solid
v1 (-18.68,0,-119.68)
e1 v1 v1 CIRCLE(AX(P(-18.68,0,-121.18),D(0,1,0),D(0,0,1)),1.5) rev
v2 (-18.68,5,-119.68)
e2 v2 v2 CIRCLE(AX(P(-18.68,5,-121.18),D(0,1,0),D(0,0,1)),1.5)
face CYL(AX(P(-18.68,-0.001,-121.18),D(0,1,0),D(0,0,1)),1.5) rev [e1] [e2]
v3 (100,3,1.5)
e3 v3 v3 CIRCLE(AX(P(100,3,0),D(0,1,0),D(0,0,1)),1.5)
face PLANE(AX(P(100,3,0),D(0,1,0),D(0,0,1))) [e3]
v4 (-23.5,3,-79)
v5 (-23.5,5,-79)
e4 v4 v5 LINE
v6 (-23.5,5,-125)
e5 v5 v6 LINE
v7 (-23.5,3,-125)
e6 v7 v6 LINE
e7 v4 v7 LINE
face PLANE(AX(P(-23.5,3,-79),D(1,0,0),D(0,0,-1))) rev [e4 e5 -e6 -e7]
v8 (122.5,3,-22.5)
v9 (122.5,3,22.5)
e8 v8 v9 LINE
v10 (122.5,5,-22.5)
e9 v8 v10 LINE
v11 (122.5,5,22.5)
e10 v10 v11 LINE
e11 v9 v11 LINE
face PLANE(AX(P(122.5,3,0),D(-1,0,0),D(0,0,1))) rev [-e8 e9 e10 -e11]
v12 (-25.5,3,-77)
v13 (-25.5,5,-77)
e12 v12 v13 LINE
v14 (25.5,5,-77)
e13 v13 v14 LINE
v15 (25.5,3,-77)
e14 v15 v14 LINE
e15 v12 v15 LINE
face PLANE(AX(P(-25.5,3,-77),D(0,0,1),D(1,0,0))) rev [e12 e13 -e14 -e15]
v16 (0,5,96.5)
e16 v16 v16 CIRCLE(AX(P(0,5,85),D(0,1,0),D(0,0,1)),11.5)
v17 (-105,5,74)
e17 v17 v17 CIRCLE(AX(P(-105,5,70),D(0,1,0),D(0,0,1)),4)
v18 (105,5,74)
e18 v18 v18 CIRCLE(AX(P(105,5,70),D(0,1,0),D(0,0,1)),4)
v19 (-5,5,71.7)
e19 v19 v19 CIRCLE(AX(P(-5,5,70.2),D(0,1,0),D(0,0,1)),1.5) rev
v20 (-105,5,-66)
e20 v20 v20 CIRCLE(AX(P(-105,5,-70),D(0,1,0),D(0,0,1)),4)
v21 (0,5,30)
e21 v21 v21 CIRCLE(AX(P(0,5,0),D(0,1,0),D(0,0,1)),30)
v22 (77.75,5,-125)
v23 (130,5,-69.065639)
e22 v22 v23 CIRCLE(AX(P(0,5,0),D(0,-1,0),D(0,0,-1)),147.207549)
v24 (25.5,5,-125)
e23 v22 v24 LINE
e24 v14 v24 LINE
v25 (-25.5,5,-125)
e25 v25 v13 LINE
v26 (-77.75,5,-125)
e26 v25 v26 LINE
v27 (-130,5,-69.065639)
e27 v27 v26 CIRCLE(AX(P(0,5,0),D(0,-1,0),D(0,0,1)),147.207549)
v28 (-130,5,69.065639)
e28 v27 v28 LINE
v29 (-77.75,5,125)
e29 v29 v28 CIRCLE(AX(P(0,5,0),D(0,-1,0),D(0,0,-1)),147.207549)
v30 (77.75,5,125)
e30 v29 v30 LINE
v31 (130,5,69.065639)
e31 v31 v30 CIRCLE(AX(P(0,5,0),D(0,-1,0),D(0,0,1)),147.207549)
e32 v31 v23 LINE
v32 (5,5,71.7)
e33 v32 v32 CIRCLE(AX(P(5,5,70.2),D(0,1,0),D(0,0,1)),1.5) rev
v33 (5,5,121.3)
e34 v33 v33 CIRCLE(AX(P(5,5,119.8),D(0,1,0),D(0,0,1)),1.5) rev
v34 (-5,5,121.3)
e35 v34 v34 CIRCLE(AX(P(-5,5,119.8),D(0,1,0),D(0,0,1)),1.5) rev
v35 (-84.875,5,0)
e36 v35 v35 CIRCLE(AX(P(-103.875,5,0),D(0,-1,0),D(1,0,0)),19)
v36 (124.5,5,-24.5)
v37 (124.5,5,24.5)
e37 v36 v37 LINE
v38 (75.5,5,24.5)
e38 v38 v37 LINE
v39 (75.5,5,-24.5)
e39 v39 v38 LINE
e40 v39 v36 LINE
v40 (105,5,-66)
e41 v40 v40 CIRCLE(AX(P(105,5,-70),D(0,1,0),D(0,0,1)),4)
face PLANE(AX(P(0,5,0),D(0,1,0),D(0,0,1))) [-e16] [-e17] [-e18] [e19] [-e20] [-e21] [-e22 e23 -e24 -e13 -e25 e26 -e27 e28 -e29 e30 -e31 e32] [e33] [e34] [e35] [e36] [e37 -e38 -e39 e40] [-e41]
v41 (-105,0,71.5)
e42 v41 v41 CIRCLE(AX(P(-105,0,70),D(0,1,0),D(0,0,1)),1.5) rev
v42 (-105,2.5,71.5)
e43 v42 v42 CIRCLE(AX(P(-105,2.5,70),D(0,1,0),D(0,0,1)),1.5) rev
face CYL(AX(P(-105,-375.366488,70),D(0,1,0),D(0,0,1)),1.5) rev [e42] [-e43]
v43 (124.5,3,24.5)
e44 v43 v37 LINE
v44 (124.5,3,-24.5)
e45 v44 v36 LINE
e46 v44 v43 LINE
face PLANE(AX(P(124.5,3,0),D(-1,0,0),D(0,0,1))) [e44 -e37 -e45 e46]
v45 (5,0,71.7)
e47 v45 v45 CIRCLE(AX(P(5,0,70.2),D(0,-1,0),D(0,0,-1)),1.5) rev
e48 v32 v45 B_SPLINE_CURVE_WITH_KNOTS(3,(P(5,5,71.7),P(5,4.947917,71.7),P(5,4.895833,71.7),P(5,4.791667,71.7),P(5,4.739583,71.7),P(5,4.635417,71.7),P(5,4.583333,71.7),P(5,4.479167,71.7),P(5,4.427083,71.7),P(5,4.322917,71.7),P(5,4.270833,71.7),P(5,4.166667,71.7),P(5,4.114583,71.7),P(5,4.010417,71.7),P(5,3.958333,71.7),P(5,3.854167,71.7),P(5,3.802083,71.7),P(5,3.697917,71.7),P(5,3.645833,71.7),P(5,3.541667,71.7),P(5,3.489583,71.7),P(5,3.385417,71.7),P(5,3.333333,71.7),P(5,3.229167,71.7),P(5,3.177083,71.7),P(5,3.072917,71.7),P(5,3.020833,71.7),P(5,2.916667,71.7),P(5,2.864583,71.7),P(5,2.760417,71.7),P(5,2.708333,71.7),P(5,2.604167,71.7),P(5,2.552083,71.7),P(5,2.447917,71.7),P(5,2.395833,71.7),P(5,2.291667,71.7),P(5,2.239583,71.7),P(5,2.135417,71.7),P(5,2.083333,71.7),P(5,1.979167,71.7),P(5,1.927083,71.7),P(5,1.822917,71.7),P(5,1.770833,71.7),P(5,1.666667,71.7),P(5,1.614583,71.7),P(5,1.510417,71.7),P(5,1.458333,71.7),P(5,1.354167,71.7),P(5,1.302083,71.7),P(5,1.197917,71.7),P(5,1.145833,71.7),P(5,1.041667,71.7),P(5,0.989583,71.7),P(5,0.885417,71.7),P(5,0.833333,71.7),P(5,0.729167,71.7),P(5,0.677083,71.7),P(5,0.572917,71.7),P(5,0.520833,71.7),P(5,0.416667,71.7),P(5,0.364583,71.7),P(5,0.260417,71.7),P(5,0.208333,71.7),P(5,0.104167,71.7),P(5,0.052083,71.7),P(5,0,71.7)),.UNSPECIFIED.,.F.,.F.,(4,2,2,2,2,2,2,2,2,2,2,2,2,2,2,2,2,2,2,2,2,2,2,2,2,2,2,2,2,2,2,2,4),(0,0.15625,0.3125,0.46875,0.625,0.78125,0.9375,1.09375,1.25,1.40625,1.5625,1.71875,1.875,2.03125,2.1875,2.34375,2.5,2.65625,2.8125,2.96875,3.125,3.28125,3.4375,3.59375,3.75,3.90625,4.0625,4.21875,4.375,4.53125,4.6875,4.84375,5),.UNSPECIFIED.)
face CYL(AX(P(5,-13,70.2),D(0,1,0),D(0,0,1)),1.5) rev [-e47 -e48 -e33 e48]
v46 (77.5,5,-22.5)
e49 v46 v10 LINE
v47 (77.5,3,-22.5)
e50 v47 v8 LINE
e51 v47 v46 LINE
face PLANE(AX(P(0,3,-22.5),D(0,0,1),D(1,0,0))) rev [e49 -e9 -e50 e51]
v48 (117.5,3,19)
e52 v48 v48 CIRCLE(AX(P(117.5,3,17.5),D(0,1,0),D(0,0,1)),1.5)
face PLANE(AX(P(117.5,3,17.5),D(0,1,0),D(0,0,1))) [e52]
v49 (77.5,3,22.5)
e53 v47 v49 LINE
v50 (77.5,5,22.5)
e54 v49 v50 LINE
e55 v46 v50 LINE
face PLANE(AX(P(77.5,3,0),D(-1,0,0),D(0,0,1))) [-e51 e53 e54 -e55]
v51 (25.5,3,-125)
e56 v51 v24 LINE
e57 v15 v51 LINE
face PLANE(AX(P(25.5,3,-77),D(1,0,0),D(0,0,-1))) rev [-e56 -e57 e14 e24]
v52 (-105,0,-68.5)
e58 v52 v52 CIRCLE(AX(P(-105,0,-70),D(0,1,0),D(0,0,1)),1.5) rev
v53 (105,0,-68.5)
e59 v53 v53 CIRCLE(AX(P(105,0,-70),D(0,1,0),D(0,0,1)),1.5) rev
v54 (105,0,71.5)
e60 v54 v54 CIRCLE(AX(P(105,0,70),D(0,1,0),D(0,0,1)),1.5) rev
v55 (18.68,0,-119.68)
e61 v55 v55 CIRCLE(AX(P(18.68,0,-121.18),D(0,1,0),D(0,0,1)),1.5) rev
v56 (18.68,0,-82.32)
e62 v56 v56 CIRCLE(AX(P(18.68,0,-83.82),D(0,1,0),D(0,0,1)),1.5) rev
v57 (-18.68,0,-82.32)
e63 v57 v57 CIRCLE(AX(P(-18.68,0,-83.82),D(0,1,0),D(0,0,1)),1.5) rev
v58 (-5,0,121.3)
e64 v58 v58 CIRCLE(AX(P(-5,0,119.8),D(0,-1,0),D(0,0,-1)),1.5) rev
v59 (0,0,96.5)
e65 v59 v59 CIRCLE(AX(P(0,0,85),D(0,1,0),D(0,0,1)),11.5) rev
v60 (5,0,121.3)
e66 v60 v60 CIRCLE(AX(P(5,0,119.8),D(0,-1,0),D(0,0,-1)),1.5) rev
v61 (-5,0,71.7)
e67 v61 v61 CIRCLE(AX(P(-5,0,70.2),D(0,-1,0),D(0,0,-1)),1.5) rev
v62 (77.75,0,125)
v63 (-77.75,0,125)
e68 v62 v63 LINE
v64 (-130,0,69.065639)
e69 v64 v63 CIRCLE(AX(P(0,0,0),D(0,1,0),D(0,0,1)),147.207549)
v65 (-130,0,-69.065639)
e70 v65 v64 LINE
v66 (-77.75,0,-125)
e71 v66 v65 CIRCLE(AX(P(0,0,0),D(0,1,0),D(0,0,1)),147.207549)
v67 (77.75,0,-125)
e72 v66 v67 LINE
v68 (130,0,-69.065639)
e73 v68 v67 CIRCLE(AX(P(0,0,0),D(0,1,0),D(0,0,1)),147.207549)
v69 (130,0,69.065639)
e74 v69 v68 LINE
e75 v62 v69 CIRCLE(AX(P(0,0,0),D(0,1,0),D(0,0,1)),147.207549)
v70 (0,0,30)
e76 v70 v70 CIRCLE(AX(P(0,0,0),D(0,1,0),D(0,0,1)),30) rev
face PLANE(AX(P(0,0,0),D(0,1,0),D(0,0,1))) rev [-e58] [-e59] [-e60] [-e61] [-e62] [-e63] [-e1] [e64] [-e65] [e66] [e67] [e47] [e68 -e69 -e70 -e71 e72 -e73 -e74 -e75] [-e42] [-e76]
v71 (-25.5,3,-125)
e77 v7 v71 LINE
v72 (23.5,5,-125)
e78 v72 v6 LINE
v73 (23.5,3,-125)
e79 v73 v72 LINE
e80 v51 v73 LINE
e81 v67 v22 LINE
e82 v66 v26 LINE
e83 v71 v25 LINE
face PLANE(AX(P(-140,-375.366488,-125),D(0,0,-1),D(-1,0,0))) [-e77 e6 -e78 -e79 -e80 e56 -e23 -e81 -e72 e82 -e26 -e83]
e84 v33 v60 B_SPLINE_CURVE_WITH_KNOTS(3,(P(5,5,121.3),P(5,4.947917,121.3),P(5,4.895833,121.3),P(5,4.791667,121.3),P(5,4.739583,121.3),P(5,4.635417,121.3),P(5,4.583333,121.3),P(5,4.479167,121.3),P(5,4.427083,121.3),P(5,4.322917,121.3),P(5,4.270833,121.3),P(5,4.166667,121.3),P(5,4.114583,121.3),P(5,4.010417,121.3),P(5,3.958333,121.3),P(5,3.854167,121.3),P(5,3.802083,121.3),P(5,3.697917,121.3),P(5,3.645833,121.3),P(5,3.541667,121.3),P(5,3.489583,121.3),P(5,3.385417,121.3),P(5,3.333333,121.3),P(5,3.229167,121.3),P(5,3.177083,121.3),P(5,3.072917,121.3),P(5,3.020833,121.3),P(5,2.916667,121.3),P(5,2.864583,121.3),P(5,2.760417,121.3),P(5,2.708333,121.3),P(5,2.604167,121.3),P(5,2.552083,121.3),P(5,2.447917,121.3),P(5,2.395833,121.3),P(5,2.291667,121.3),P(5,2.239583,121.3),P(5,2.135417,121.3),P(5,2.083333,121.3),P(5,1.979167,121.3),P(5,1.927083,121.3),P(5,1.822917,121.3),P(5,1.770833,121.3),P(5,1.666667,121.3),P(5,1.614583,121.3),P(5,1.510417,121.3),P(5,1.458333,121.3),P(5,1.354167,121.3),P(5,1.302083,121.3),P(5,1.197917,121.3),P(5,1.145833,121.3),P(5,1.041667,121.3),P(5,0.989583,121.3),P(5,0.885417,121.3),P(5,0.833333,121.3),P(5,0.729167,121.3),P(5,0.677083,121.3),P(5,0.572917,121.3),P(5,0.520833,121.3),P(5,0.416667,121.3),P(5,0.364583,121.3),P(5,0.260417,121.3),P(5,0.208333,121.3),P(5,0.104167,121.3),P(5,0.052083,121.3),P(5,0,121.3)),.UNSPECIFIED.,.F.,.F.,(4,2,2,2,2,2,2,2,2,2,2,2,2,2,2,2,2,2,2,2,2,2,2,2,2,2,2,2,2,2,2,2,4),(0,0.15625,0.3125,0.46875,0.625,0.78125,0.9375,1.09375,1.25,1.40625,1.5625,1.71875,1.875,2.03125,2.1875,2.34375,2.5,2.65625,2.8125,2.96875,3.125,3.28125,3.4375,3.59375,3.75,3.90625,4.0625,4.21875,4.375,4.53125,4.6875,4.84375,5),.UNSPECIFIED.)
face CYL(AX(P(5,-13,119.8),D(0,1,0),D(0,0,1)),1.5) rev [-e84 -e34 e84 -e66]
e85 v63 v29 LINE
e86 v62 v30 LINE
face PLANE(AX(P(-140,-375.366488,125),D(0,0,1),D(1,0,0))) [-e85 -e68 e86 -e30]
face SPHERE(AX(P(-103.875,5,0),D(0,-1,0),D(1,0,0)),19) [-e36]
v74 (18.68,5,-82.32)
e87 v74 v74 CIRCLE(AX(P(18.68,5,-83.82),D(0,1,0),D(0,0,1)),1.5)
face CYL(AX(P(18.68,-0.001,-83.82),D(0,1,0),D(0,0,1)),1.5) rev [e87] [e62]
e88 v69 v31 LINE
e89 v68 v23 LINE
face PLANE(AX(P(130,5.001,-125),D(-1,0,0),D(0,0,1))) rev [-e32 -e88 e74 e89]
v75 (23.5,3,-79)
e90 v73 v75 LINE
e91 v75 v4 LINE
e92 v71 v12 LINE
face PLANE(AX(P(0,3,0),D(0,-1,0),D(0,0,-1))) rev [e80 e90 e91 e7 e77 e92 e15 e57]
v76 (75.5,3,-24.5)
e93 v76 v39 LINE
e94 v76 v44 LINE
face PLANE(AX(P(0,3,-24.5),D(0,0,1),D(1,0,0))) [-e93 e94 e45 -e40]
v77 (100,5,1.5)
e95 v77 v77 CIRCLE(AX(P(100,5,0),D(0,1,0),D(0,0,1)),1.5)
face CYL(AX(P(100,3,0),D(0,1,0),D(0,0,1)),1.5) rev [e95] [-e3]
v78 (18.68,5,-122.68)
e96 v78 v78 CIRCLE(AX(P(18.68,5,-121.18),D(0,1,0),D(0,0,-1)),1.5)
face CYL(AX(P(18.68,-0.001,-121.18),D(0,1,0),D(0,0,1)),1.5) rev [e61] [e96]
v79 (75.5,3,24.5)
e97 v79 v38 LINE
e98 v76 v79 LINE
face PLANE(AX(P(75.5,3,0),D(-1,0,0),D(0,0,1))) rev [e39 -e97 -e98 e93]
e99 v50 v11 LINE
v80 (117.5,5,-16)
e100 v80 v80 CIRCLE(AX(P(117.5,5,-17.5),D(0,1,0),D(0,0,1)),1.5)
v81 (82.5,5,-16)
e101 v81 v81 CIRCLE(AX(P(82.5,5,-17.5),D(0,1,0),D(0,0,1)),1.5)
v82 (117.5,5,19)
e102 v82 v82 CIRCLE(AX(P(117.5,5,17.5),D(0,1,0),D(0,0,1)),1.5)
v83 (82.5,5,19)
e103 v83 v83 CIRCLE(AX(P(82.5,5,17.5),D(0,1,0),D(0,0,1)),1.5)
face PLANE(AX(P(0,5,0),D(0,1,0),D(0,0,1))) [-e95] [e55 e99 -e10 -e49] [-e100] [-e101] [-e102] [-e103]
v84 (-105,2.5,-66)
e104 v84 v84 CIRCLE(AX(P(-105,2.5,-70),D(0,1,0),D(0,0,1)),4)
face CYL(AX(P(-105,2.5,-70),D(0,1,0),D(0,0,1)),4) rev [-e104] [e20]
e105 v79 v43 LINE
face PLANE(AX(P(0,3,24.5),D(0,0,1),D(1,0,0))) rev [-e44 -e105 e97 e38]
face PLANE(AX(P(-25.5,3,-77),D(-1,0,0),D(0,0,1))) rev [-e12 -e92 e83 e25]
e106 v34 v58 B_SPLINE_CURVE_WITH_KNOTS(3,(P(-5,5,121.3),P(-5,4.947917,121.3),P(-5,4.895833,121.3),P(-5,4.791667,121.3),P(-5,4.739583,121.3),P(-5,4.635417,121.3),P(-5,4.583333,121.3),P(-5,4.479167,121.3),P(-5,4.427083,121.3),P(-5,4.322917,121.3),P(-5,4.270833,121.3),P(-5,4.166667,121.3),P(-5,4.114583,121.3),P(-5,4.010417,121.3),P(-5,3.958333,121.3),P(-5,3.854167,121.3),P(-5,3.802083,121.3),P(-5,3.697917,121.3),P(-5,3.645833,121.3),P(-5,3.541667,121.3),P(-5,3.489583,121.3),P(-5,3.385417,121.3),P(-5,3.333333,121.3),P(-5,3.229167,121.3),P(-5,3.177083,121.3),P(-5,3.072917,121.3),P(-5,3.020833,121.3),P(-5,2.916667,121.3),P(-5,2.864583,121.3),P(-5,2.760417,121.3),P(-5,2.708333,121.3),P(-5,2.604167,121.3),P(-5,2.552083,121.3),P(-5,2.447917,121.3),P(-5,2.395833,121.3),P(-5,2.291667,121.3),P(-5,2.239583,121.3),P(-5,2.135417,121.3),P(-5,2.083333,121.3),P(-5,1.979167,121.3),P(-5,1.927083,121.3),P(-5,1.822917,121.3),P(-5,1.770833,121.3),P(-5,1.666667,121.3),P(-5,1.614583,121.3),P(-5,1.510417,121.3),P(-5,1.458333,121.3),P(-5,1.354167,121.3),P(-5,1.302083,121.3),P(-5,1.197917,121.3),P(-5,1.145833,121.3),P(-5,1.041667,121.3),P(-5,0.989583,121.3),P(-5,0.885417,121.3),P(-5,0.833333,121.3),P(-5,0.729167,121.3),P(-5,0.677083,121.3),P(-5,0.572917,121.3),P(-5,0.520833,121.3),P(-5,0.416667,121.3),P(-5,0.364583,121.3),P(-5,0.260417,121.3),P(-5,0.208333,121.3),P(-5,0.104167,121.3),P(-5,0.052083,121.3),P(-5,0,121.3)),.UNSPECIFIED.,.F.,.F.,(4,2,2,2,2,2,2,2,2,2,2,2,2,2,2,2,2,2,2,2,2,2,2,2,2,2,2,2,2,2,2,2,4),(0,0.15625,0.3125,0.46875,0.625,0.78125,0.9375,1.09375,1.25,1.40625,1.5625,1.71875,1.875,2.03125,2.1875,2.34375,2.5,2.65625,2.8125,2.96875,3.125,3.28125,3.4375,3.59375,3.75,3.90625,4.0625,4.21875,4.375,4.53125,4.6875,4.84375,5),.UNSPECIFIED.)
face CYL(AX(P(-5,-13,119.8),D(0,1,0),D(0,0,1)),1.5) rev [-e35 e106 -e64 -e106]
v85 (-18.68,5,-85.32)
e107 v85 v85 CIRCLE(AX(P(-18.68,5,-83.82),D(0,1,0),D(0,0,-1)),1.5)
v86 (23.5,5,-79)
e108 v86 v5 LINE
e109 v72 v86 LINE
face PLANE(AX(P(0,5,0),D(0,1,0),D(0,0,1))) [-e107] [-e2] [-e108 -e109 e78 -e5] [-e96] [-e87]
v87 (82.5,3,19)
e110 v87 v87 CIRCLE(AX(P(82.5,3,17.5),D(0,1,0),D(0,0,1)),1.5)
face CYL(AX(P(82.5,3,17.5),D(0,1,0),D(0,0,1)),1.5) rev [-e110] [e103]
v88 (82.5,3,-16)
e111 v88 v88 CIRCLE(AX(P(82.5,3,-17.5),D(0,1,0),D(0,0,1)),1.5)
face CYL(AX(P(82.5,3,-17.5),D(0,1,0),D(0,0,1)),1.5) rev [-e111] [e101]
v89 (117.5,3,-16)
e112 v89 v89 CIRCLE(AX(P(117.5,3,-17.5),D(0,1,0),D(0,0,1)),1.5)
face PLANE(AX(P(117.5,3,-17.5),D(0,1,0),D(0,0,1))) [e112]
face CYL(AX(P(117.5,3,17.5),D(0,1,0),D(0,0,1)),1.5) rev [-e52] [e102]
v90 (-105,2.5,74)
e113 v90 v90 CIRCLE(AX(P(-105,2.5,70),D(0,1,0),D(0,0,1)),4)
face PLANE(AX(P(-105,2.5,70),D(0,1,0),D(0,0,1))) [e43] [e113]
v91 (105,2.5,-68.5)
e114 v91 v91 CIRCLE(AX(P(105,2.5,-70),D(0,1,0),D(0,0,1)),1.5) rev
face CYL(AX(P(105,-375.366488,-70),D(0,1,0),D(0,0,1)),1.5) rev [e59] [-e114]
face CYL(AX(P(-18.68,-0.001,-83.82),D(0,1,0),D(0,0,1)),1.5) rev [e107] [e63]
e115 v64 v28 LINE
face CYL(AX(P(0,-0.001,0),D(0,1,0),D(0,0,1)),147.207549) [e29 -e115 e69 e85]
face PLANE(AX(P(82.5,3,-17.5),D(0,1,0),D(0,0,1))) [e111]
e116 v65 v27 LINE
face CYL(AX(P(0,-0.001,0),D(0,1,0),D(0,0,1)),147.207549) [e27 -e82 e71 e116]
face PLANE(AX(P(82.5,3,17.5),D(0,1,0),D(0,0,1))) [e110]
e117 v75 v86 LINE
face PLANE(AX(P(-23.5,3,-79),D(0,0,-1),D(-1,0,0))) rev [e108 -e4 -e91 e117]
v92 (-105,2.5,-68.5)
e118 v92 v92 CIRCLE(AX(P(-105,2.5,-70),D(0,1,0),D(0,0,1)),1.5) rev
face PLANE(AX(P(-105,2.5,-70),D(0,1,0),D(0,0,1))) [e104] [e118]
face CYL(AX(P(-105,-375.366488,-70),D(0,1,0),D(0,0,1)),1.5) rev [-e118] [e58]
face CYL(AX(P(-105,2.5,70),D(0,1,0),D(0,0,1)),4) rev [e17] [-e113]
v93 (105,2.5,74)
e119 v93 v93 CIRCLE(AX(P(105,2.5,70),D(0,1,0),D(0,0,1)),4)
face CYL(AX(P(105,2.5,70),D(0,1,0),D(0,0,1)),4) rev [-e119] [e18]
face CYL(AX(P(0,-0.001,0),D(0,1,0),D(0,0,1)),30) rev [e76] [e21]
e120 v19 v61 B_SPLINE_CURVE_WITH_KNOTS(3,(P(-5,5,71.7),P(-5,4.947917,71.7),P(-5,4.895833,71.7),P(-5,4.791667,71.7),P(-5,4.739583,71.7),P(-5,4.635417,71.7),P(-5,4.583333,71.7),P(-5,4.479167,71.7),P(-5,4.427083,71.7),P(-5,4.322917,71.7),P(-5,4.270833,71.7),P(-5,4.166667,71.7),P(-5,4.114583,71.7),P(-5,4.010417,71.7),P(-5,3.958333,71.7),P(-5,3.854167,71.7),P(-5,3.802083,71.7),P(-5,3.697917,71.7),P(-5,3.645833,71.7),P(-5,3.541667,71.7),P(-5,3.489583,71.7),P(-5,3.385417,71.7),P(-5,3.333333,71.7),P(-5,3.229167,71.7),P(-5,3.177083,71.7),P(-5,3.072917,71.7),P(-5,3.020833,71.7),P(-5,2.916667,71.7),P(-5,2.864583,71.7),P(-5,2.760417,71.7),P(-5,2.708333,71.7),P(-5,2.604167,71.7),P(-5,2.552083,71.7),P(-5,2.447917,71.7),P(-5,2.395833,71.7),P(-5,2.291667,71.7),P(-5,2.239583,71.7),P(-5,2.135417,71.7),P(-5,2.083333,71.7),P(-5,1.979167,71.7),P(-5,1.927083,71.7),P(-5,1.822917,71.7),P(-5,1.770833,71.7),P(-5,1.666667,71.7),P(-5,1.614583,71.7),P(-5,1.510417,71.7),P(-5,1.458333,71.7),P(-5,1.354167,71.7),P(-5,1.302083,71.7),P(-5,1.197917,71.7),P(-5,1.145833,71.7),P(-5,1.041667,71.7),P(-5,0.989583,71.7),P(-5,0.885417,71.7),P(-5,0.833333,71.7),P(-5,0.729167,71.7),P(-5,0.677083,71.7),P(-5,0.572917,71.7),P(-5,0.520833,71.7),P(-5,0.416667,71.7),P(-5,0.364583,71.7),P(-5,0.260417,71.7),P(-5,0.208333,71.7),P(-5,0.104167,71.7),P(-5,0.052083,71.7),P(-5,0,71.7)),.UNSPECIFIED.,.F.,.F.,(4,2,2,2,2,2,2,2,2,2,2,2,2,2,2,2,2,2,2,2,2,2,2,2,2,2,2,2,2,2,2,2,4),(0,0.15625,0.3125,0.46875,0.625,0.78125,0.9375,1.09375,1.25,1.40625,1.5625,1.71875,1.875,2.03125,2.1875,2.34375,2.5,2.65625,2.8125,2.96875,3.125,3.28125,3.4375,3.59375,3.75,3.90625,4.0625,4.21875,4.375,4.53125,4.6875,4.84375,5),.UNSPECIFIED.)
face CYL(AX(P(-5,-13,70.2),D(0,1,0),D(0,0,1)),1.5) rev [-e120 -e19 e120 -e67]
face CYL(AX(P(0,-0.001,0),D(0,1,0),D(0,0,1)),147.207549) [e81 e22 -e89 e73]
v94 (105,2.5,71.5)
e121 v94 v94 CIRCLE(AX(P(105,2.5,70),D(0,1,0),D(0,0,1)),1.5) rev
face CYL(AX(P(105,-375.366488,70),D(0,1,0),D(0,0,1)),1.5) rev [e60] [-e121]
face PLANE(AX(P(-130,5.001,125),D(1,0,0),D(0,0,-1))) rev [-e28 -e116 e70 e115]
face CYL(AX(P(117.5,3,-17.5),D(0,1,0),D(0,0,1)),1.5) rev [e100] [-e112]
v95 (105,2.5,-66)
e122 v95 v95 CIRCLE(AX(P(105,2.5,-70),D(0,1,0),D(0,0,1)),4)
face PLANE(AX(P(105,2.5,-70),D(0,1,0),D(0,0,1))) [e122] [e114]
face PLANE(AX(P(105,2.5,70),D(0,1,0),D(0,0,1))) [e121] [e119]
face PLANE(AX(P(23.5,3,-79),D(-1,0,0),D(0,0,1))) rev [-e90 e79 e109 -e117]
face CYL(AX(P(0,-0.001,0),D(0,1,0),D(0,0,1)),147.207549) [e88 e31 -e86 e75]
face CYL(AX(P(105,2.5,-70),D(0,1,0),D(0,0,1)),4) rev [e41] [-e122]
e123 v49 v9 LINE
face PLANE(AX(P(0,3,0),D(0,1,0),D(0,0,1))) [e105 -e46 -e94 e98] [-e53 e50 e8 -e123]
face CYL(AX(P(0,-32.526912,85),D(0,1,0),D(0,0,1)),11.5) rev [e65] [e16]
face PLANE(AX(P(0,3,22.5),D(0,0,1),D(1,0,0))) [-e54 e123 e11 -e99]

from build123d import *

# Parameters (mm, degrees)
SKETCH_1_W           = 200
SKETCH_1_H           = 150
EXTRUDE_1_DEPTH      = 5
SKETCH_2_W           = 280
SKETCH_2_H           = 250
SKETCH_2_R           = 1.5
EXTRUDE_2_DEPTH      = 5
SKETCH_3_R           = 11.5
CUT_EXTRUDE_1_DEPTH  = 5
SKETCH_4_R           = 3
SKETCH_4_R_2         = 1.5
EXTRUDE_3_DEPTH      = 13
CUT_EXTRUDE_4_REACH  = 190.133
SKETCH_8_R           = 1.5
CUT_EXTRUDE_5_REACH  = 190.133
SKETCH_9_W           = 10
SKETCH_9_H           = 250
SKETCH_10_W          = 41.454704644
SKETCH_10_H          = 62.998147515
CUT_EXTRUDE_6_DEPTH  = 13
CUT_EXTRUDE_7_REACH  = 182.416
SKETCH_11_R          = 1.5
CUT_EXTRUDE_8_DEPTH  = 2
CUT_EXTRUDE_9_REACH  = 182.416
SKETCH_13_R          = 30
CUT_EXTRUDE_10_REACH = 182.416
SKETCH_17_R          = 4
CUT_EXTRUDE_11_DEPTH = 2.5
SKETCH_18_W          = 49
SKETCH_18_H          = 49
SKETCH_18_W_2        = 45
SKETCH_18_H_2        = 45
CUT_EXTRUDE_12_DEPTH = 2
SKETCH_19_R          = 1.5
CUT_EXTRUDE_13_DEPTH = 2


# Read off the part's stored shape, not the designer's step: 旋转4
with BuildPart() as part:
    # 草图1 → 凸台-拉伸1 (new body)
    with BuildSketch(Plane(origin=(0, 0, 0), x_dir=(1, 0, 0), z_dir=(0, 1, 0))):
        Rectangle(SKETCH_1_W, SKETCH_1_H)
    extrude(amount=EXTRUDE_1_DEPTH)

    # 草图2 → 凸台-拉伸2 (add)
    with BuildSketch(Plane(origin=(0, 5, 0), x_dir=(1, 0, 0), z_dir=(0, 1, 0))):
        Rectangle(SKETCH_2_W, SKETCH_2_H)
        with Locations(Location((-105, 70, 0), (0, 0, 270))):
            Circle(SKETCH_2_R, mode=Mode.SUBTRACT)
        with Locations(Location((-105, -70, 0), (0, 0, 270))):
            Circle(SKETCH_2_R, mode=Mode.SUBTRACT)
        with Locations(Location((105, 70, 0), (0, 0, 270))):
            Circle(SKETCH_2_R, mode=Mode.SUBTRACT)
        with Locations(Location((105, -70, 0), (0, 0, 270))):
            Circle(SKETCH_2_R, mode=Mode.SUBTRACT)
    extrude(amount=-EXTRUDE_2_DEPTH)

    # 草图3 → 切除-拉伸1 (cut)
    with BuildSketch(Plane(origin=(0, 5, 0), x_dir=(1, 0, 0), z_dir=(0, 1, 0))):
        with Locations(Location((0, -85, 0), (0, 0, 270))):
            Circle(SKETCH_3_R)
    extrude(amount=-CUT_EXTRUDE_1_DEPTH, mode=Mode.SUBTRACT)

    # 草图4 → 凸台-拉伸3 (add)
    # profile 1 of 4: a face of its own
    with BuildSketch(Plane.XZ):
        with Locations(Location((-5, 119.8, 0), (0, 0, 90))):
            Circle(SKETCH_4_R)
        with Locations(Location((-5, 119.8, 0), (0, 0, 90))):
            Circle(SKETCH_4_R_2, mode=Mode.SUBTRACT)
    # profile 2 of 4: a face of its own
    with BuildSketch(Plane.XZ):
        with Locations(Location((5, 119.8, 0), (0, 0, 90))):
            Circle(SKETCH_4_R)
        with Locations(Location((5, 119.8, 0), (0, 0, 90))):
            Circle(SKETCH_4_R_2, mode=Mode.SUBTRACT)
    # profile 3 of 4: a face of its own
    with BuildSketch(Plane.XZ):
        with Locations(Location((5, 70.2, 0), (0, 0, 90))):
            Circle(SKETCH_4_R)
        with Locations(Location((5, 70.2, 0), (0, 0, 90))):
            Circle(SKETCH_4_R_2, mode=Mode.SUBTRACT)
    # profile 4 of 4: a face of its own
    with BuildSketch(Plane.XZ):
        with Locations(Location((-5, 70.2, 0), (0, 0, 90))):
            Circle(SKETCH_4_R)
        with Locations(Location((-5, 70.2, 0), (0, 0, 90))):
            Circle(SKETCH_4_R_2, mode=Mode.SUBTRACT)
    extrude(amount=EXTRUDE_3_DEPTH)

    # 草图8 → 切除-拉伸4 (cut, up to next)
    with BuildSketch(Plane.XZ, mode=Mode.PRIVATE) as cut_extrude_4_sk1:
        with Locations(Location((5, 119.8, 0), (0, 0, 90))):
            Circle(SKETCH_8_R)
    cut_extrude_4_tool1 = extrude(cut_extrude_4_sk1.sketch, amount=-CUT_EXTRUDE_4_REACH, mode=Mode.PRIVATE) & part.part
    # 草图8 → 切除-拉伸4 (cut, up to next)
    with BuildSketch(Plane.XZ, mode=Mode.PRIVATE) as cut_extrude_4_sk2:
        with Locations(Location((5, 70.2, 0), (0, 0, 90))):
            Circle(SKETCH_8_R)
    cut_extrude_4_tool2 = extrude(cut_extrude_4_sk2.sketch, amount=-CUT_EXTRUDE_4_REACH, mode=Mode.PRIVATE) & part.part
    # 草图8 → 切除-拉伸4 (cut, up to next)
    with BuildSketch(Plane.XZ, mode=Mode.PRIVATE) as cut_extrude_4_sk3:
        with Locations(Location((-5, 119.8, 0), (0, 0, 90))):
            Circle(SKETCH_8_R)
    cut_extrude_4_tool3 = extrude(cut_extrude_4_sk3.sketch, amount=-CUT_EXTRUDE_4_REACH, mode=Mode.PRIVATE) & part.part
    # 草图8 → 切除-拉伸4 (cut, up to next)
    with BuildSketch(Plane.XZ, mode=Mode.PRIVATE) as cut_extrude_4_sk4:
        with Locations(Location((-5, 70.2, 0), (0, 0, 90))):
            Circle(SKETCH_8_R)
    cut_extrude_4_tool4 = extrude(cut_extrude_4_sk4.sketch, amount=-CUT_EXTRUDE_4_REACH, mode=Mode.PRIVATE) & part.part
    add(cut_extrude_4_tool1.solids().sort_by_distance((5, 0, 119.8))[0], mode=Mode.SUBTRACT)
    add(cut_extrude_4_tool2.solids().sort_by_distance((5, 0, 70.2))[0], mode=Mode.SUBTRACT)
    add(cut_extrude_4_tool3.solids().sort_by_distance((-5, 0, 119.8))[0], mode=Mode.SUBTRACT)
    add(cut_extrude_4_tool4.solids().sort_by_distance((-5, 0, 70.2))[0], mode=Mode.SUBTRACT)

    # 草图9 → 切除-拉伸5 (cut, up to next)
    with BuildSketch(Plane.XZ, mode=Mode.PRIVATE) as cut_extrude_5_sk1:
        with Locations((-135, 0)):
            Rectangle(SKETCH_9_W, SKETCH_9_H)
    cut_extrude_5_tool1 = extrude(cut_extrude_5_sk1.sketch, amount=-CUT_EXTRUDE_5_REACH, mode=Mode.PRIVATE) & part.part
    # 草图9 → 切除-拉伸5 (cut, up to next)
    with BuildSketch(Plane.XZ, mode=Mode.PRIVATE) as cut_extrude_5_sk2:
        with Locations((135, 0)):
            Rectangle(SKETCH_9_W, SKETCH_9_H)
    cut_extrude_5_tool2 = extrude(cut_extrude_5_sk2.sketch, amount=-CUT_EXTRUDE_5_REACH, mode=Mode.PRIVATE) & part.part
    add(cut_extrude_5_tool1.solids().sort_by_distance((-135, 0, 0))[0], mode=Mode.SUBTRACT)
    add(cut_extrude_5_tool2.solids().sort_by_distance((135, 0, 0))[0], mode=Mode.SUBTRACT)

    # 草图10 → 切除-拉伸6 (cut)
    with BuildSketch(Plane.XZ):
        with Locations((1.571094054, 93.500926243)):
            Rectangle(SKETCH_10_W, SKETCH_10_H)
    extrude(amount=CUT_EXTRUDE_6_DEPTH, mode=Mode.SUBTRACT)

    # 草图11 → 切除-拉伸7 (cut, up to next)
    with BuildSketch(Plane(origin=(0, 5, 0), x_dir=(1, 0, 0), z_dir=(0, 1, 0)), mode=Mode.PRIVATE) as cut_extrude_7_sk1:
        with Locations(Location((-18.68, 121.18, 0), (0, 0, 270))):
            Circle(SKETCH_11_R)
    cut_extrude_7_tool1 = extrude(cut_extrude_7_sk1.sketch, amount=-CUT_EXTRUDE_7_REACH, mode=Mode.PRIVATE) & part.part
    # 草图11 → 切除-拉伸7 (cut, up to next)
    with BuildSketch(Plane(origin=(0, 5, 0), x_dir=(1, 0, 0), z_dir=(0, 1, 0)), mode=Mode.PRIVATE) as cut_extrude_7_sk2:
        with Locations(Location((18.68, 121.18, 0), (0, 0, 270))):
            Circle(SKETCH_11_R)
    cut_extrude_7_tool2 = extrude(cut_extrude_7_sk2.sketch, amount=-CUT_EXTRUDE_7_REACH, mode=Mode.PRIVATE) & part.part
    # 草图11 → 切除-拉伸7 (cut, up to next)
    with BuildSketch(Plane(origin=(0, 5, 0), x_dir=(1, 0, 0), z_dir=(0, 1, 0)), mode=Mode.PRIVATE) as cut_extrude_7_sk3:
        with Locations(Location((18.68, 83.82, 0), (0, 0, 270))):
            Circle(SKETCH_11_R)
    cut_extrude_7_tool3 = extrude(cut_extrude_7_sk3.sketch, amount=-CUT_EXTRUDE_7_REACH, mode=Mode.PRIVATE) & part.part
    # 草图11 → 切除-拉伸7 (cut, up to next)
    with BuildSketch(Plane(origin=(0, 5, 0), x_dir=(1, 0, 0), z_dir=(0, 1, 0)), mode=Mode.PRIVATE) as cut_extrude_7_sk4:
        with Locations(Location((-18.68, 83.82, 0), (0, 0, 270))):
            Circle(SKETCH_11_R)
    cut_extrude_7_tool4 = extrude(cut_extrude_7_sk4.sketch, amount=-CUT_EXTRUDE_7_REACH, mode=Mode.PRIVATE) & part.part
    add(cut_extrude_7_tool1.solids().sort_by_distance((-18.68, 5, -121.18))[0], mode=Mode.SUBTRACT)
    add(cut_extrude_7_tool2.solids().sort_by_distance((18.68, 5, -121.18))[0], mode=Mode.SUBTRACT)
    add(cut_extrude_7_tool3.solids().sort_by_distance((18.68, 5, -83.82))[0], mode=Mode.SUBTRACT)
    add(cut_extrude_7_tool4.solids().sort_by_distance((-18.68, 5, -83.82))[0], mode=Mode.SUBTRACT)

    # 草图12 → 切除-拉伸8 (cut)
    with BuildSketch(Plane(origin=(0, 5, 0), x_dir=(1, 0, 0), z_dir=(0, 1, 0))):
        Polygon((-23.5, 79), (23.5, 79), (23.5, 125), (25.5, 125), (25.5, 77), (-25.5, 77), (-25.5, 125), (-23.5, 125), align=None)
    extrude(amount=-CUT_EXTRUDE_8_DEPTH, mode=Mode.SUBTRACT)

    # 草图13 → 切除-拉伸9 (cut, up to next)
    with BuildSketch(Plane(origin=(0, 5, 0), x_dir=(1, 0, 0), z_dir=(0, 1, 0)), mode=Mode.PRIVATE) as cut_extrude_9_sk1:
        with Locations(Location((0, 0, 0), (0, 0, 270))):
            Circle(SKETCH_13_R)
    cut_extrude_9_tool1 = extrude(cut_extrude_9_sk1.sketch, amount=-CUT_EXTRUDE_9_REACH, mode=Mode.PRIVATE) & part.part
    add(cut_extrude_9_tool1.solids().sort_by_distance((0, 5, 0))[0], mode=Mode.SUBTRACT)

    # 草图14 → 切除-拉伸10 (cut, up to next)
    with BuildSketch(Plane(origin=(0, 5, 0), x_dir=(1, 0, 0), z_dir=(0, 1, 0)), mode=Mode.PRIVATE) as cut_extrude_10_sk1:
        with BuildLine():
            Line((77.75, 125), (130, 125))
            Line((130, 125), (130, 69.065639069))
            ThreePointArc((130, 69.065639069), (107.574061968, 100.488226633), (77.75, 125))
        make_face()
    cut_extrude_10_tool1 = extrude(cut_extrude_10_sk1.sketch, amount=-CUT_EXTRUDE_10_REACH, mode=Mode.PRIVATE) & part.part
    # 草图14 → 切除-拉伸10 (cut, up to next)
    with BuildSketch(Plane(origin=(0, 5, 0), x_dir=(1, 0, 0), z_dir=(0, 1, 0)), mode=Mode.PRIVATE) as cut_extrude_10_sk2:
        with BuildLine():
            Line((77.75, -125), (130, -125))
            Line((130, -125), (130, -69.065639069))
            ThreePointArc((130, -69.065639069), (107.574061968, -100.488226633), (77.75, -125))
        make_face()
    cut_extrude_10_tool2 = extrude(cut_extrude_10_sk2.sketch, amount=-CUT_EXTRUDE_10_REACH, mode=Mode.PRIVATE) & part.part
    # 草图14 → 切除-拉伸10 (cut, up to next)
    with BuildSketch(Plane(origin=(0, 5, 0), x_dir=(1, 0, 0), z_dir=(0, 1, 0)), mode=Mode.PRIVATE) as cut_extrude_10_sk3:
        with BuildLine():
            Line((-130, -125), (-130, -69.065639069))
            ThreePointArc((-130, -69.065639069), (-107.574061968, -100.488226633), (-77.75, -125))
            Line((-77.75, -125), (-130, -125))
        make_face()
    cut_extrude_10_tool3 = extrude(cut_extrude_10_sk3.sketch, amount=-CUT_EXTRUDE_10_REACH, mode=Mode.PRIVATE) & part.part
    # 草图14 → 切除-拉伸10 (cut, up to next)
    with BuildSketch(Plane(origin=(0, 5, 0), x_dir=(1, 0, 0), z_dir=(0, 1, 0)), mode=Mode.PRIVATE) as cut_extrude_10_sk4:
        with BuildLine():
            Line((-130, 125), (-130, 69.065639069))
            ThreePointArc((-130, 69.065639069), (-107.574061968, 100.488226633), (-77.75, 125))
            Line((-77.75, 125), (-130, 125))
        make_face()
    cut_extrude_10_tool4 = extrude(cut_extrude_10_sk4.sketch, amount=-CUT_EXTRUDE_10_REACH, mode=Mode.PRIVATE) & part.part
    add(cut_extrude_10_tool1.solids().sort_by_distance((114.14156, 5, -108.066894))[0], mode=Mode.SUBTRACT)
    add(cut_extrude_10_tool2.solids().sort_by_distance((114.14156, 5, 108.066894))[0], mode=Mode.SUBTRACT)
    add(cut_extrude_10_tool3.solids().sort_by_distance((-114.14156, 5, 108.066894))[0], mode=Mode.SUBTRACT)
    add(cut_extrude_10_tool4.solids().sort_by_distance((-114.14156, 5, -108.066894))[0], mode=Mode.SUBTRACT)

    # 旋转4 outline → 旋转4 (revolve)
    with BuildSketch(Plane(origin=(-103.875, 0, 0), x_dir=(1, 0, 0), z_dir=(0, 0, 1))):
        with BuildLine():
            Line((0, 4.999999981), (19, 4.999999981))
            ThreePointArc((19, 4.999999981), (13.435028849, 18.435028836), (0, 24))
            Line((0, 24), (0, 4.999999981))
        make_face()
    revolve(axis=Axis((-103.875, 0, 0), (0, 1, 0)))

    # 草图17 → 切除-拉伸11 (cut)
    with BuildSketch(Plane(origin=(0, 5, 0), x_dir=(1, 0, 0), z_dir=(0, 1, 0))):
        with Locations(Location((-105, 70, 0), (0, 0, 270))):
            Circle(SKETCH_17_R)
        with Locations(Location((105, 70, 0), (0, 0, 270))):
            Circle(SKETCH_17_R)
        with Locations(Location((105, -70, 0), (0, 0, 270))):
            Circle(SKETCH_17_R)
        with Locations(Location((-105, -70, 0), (0, 0, 270))):
            Circle(SKETCH_17_R)
    extrude(amount=-CUT_EXTRUDE_11_DEPTH, mode=Mode.SUBTRACT)

    # 草图18 → 切除-拉伸12 (cut)
    with BuildSketch(Plane(origin=(0, 5, 0), x_dir=(1, 0, 0), z_dir=(0, 1, 0))):
        with Locations((100, 0)):
            Rectangle(SKETCH_18_W, SKETCH_18_H)
        with Locations((100, 0)):
            Rectangle(SKETCH_18_W_2, SKETCH_18_H_2, mode=Mode.SUBTRACT)
    extrude(amount=-CUT_EXTRUDE_12_DEPTH, mode=Mode.SUBTRACT)

    # 草图19 → 切除-拉伸13 (cut)
    with BuildSketch(Plane(origin=(0, 5, 0), x_dir=(1, 0, 0), z_dir=(0, 1, 0))):
        with Locations(Location((117.5, 17.5, 0), (0, 0, 270))):
            Circle(SKETCH_19_R)
        with Locations(Location((82.5, 17.5, 0), (0, 0, 270))):
            Circle(SKETCH_19_R)
        with Locations(Location((117.5, -17.5, 0), (0, 0, 270))):
            Circle(SKETCH_19_R)
        with Locations(Location((82.5, -17.5, 0), (0, 0, 270))):
            Circle(SKETCH_19_R)
        with Locations(Location((100, 0, 0), (0, 0, 270))):
            Circle(SKETCH_19_R)
    extrude(amount=-CUT_EXTRUDE_13_DEPTH, mode=Mode.SUBTRACT)


solid = part.part
